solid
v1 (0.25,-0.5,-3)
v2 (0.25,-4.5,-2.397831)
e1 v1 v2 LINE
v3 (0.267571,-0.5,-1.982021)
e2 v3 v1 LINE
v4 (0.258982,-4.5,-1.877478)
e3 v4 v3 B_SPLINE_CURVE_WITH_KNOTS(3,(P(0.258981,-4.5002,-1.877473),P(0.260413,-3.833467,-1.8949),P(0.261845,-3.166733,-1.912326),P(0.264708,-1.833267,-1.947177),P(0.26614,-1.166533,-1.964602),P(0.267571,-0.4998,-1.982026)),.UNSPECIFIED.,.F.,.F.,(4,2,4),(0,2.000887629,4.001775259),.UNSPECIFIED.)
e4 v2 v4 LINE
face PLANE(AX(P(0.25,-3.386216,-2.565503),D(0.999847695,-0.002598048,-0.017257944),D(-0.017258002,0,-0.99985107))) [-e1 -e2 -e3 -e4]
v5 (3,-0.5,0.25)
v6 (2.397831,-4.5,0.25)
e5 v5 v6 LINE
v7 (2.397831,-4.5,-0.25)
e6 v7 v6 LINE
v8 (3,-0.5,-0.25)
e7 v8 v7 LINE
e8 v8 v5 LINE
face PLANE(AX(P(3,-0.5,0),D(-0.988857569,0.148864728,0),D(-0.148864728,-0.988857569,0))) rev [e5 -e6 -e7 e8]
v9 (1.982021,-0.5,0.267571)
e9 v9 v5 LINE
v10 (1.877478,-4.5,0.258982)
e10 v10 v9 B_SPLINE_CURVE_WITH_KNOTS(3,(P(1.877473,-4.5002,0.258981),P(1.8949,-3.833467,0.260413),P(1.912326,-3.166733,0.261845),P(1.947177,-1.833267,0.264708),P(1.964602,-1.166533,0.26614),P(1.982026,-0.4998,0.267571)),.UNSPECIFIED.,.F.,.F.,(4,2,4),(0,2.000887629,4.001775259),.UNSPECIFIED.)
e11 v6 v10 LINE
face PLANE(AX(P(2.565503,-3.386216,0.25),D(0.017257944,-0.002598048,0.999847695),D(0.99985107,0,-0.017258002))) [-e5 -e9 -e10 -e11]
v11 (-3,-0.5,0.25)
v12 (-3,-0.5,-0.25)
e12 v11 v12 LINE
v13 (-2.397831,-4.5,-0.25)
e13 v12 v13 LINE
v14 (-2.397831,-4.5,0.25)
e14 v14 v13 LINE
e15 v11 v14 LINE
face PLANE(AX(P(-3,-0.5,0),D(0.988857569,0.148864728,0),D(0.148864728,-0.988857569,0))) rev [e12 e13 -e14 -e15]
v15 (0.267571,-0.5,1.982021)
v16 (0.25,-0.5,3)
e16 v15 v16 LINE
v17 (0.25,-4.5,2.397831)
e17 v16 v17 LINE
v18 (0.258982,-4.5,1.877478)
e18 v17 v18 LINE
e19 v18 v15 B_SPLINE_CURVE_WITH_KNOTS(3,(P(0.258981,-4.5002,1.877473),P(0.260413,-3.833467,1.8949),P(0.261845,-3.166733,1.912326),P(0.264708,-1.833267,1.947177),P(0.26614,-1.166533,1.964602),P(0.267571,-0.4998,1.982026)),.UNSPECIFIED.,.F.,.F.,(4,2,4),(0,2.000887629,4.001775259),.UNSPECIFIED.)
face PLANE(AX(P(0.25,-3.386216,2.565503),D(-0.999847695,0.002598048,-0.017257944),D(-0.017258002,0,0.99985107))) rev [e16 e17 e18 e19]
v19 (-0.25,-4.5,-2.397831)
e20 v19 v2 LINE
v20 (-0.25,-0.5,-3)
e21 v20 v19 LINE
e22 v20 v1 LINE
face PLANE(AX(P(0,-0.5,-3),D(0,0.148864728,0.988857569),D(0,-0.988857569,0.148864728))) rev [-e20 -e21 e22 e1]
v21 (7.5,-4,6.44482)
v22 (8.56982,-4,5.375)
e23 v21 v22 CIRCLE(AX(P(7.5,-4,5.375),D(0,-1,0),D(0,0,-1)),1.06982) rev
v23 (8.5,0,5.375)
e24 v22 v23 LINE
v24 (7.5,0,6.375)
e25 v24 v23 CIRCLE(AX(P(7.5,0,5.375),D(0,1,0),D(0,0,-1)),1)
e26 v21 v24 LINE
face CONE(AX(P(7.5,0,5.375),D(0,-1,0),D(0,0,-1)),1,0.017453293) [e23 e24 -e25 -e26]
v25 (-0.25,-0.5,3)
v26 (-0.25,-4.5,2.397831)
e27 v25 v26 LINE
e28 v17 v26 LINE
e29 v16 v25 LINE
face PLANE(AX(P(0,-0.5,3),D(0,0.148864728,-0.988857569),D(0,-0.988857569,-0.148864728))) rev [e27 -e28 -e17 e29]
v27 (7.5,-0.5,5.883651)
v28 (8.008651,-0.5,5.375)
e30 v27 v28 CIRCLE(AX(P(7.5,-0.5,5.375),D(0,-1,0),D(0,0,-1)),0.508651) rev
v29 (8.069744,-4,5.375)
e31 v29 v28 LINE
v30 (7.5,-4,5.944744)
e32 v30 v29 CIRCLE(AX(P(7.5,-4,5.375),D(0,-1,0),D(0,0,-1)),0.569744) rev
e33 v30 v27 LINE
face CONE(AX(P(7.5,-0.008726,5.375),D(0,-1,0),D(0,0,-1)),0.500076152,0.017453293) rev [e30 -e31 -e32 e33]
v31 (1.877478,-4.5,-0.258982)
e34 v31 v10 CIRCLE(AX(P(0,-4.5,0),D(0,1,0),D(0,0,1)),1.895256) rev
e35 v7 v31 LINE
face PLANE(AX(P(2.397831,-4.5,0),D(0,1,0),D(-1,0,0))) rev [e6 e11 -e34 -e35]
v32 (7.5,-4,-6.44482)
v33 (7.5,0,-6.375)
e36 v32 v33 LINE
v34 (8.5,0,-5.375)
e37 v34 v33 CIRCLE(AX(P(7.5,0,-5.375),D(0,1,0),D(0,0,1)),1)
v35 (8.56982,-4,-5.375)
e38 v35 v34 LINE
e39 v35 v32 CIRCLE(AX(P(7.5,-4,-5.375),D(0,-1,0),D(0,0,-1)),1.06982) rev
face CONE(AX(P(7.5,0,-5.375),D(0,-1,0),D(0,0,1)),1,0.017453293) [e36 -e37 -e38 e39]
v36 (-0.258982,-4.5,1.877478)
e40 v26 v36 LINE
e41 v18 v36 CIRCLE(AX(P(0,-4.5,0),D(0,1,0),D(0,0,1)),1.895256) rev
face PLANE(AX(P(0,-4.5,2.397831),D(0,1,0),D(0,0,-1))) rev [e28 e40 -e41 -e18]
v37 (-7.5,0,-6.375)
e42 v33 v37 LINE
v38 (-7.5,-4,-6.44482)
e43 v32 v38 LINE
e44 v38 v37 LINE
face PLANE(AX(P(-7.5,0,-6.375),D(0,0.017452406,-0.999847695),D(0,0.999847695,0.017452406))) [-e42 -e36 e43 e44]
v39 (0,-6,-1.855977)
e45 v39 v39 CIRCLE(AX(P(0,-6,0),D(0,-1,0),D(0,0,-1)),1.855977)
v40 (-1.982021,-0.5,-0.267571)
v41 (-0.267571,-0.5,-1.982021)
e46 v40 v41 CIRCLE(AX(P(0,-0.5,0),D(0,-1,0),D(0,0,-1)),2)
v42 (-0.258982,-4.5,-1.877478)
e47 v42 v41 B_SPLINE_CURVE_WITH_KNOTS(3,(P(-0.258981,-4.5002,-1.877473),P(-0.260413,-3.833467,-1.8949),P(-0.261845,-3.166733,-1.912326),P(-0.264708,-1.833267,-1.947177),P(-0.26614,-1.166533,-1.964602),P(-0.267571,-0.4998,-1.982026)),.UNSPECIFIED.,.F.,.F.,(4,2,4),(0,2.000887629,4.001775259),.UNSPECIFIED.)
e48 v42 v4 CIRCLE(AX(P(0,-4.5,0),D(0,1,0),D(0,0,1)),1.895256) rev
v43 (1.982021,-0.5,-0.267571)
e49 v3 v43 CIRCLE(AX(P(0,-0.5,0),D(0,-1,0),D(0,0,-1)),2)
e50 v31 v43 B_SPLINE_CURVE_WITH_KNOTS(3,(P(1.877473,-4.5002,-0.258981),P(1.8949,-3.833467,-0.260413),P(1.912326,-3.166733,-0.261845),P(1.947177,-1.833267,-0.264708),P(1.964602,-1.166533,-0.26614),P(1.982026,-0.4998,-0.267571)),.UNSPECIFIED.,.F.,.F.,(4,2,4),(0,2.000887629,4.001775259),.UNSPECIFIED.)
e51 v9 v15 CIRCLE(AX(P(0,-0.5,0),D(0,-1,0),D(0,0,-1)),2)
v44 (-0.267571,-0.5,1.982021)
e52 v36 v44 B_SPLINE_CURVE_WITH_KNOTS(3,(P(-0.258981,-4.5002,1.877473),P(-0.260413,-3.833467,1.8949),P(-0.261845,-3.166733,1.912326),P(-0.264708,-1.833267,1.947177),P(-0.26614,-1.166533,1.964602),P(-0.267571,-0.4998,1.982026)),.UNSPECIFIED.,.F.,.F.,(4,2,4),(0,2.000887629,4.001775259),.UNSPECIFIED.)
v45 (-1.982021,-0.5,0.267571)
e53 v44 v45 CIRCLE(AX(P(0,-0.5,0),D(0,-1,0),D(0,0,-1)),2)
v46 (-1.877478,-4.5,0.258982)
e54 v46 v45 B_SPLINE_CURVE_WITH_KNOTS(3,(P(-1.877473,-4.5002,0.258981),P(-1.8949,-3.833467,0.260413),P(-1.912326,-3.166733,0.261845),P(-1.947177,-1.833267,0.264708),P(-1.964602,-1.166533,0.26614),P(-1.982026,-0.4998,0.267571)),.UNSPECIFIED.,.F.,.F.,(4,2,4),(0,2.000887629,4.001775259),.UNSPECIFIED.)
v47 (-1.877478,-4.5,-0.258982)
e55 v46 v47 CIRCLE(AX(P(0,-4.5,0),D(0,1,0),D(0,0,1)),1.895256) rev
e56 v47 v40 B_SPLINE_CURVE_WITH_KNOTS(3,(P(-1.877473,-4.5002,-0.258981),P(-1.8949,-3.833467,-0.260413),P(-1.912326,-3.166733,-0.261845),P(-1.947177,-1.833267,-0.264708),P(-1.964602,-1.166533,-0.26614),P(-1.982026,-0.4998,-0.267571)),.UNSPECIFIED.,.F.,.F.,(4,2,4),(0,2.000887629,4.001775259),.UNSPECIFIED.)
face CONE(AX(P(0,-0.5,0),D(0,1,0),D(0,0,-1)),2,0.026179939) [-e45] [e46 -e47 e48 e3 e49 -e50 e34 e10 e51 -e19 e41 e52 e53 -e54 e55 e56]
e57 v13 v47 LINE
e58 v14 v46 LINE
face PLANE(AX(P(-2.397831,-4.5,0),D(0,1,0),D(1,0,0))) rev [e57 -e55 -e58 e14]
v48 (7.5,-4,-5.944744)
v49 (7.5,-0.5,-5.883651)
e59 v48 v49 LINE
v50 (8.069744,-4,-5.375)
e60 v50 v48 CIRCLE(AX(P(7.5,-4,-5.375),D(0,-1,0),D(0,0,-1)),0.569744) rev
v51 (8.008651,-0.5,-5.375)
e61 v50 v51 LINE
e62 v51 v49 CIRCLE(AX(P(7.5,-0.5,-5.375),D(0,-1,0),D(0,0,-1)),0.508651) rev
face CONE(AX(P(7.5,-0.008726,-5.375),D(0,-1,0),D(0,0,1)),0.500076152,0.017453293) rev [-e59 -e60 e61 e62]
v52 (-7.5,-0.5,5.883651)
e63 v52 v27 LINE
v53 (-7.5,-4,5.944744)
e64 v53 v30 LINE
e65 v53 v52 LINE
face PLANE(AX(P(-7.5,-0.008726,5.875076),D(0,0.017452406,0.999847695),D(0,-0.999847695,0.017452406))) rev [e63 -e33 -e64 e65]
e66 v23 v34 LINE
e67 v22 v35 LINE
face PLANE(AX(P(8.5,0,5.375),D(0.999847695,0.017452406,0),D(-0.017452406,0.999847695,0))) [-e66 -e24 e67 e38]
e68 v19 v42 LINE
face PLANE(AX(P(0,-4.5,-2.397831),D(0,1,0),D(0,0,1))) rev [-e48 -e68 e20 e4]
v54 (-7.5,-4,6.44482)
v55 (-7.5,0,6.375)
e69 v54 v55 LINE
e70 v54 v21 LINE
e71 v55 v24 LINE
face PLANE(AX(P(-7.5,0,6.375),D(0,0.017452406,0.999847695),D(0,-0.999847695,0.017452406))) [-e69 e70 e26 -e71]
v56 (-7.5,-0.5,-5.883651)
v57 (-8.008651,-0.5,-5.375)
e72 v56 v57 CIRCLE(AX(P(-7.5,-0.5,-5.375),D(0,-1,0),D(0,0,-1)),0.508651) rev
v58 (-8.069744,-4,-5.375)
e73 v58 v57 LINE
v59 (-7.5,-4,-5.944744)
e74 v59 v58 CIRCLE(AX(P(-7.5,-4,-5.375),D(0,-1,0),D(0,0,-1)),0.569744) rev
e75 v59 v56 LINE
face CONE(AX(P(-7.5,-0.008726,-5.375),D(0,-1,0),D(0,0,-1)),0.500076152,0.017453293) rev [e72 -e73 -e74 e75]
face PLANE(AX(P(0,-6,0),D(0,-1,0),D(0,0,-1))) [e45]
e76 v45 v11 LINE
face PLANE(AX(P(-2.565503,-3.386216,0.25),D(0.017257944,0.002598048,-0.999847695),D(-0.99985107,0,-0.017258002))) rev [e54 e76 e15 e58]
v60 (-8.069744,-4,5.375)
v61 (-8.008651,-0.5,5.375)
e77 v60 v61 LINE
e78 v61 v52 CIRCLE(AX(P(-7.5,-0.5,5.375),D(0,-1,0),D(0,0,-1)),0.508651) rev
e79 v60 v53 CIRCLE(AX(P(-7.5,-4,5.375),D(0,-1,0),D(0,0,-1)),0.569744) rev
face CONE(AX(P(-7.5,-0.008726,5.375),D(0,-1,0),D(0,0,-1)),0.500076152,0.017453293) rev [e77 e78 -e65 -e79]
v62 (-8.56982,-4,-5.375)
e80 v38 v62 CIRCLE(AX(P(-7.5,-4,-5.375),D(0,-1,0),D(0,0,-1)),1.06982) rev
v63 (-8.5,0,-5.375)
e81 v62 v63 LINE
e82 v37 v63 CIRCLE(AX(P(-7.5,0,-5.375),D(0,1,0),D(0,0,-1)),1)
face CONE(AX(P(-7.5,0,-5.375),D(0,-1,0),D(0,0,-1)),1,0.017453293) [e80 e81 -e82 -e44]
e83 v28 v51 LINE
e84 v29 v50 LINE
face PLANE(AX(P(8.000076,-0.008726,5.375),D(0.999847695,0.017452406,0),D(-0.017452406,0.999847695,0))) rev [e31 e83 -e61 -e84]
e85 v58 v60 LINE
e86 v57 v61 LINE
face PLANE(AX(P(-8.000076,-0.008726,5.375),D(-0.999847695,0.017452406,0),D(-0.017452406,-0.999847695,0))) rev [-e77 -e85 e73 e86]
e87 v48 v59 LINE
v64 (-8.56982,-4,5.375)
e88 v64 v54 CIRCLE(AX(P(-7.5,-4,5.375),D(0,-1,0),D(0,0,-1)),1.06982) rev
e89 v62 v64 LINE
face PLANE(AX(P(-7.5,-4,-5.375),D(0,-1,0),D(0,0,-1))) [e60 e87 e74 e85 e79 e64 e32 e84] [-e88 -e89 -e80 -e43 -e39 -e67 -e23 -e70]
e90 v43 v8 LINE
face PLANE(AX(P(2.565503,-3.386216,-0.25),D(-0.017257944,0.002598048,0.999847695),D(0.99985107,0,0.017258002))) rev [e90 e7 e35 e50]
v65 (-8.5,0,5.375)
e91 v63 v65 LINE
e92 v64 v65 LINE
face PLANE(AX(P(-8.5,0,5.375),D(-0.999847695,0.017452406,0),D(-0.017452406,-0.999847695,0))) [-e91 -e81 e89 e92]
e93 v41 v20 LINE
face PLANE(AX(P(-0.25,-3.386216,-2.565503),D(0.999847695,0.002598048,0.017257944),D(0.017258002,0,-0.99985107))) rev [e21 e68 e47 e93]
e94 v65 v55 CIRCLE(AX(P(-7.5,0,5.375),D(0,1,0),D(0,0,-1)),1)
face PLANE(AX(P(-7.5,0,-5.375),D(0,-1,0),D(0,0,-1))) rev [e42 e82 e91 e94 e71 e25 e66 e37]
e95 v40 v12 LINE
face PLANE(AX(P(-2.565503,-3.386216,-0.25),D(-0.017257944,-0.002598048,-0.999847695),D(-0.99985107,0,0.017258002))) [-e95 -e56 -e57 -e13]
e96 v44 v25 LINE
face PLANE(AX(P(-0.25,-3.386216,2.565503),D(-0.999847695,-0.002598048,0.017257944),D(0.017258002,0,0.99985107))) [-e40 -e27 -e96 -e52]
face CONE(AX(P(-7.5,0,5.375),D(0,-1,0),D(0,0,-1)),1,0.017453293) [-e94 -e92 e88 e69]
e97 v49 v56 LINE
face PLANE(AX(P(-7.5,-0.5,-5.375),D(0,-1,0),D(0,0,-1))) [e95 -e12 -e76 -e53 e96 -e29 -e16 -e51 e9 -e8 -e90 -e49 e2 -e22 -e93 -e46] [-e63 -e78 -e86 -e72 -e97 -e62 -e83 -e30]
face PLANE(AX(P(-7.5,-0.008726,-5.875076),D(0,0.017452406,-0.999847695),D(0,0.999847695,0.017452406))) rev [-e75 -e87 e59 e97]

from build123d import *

# Parameters (mm, degrees)
BOSS_EXTRUDE1_DEPTH = 4
BOSS_EXTRUDE1_DRAFT = 1
SHELL1_T            = -0.5
SKETCH2_R           = 2
BOSS_EXTRUDE2_DEPTH = 5.5
BOSS_EXTRUDE2_TAPER = 1.5
CIRPATTERN1_COUNT   = 4


with BuildPart() as part:
    # Sketch1 → Boss-Extrude1 (with draft: the straight prism first)
    with BuildSketch(Plane(origin=(0, 0, 0), x_dir=(1, 0, 0), z_dir=(0, 1, 0))):
        with BuildLine():
            Line((-7.5, -6.375), (7.5, -6.375))
            ThreePointArc((7.5, -6.375), (8.207106781, -6.082106781), (8.5, -5.375))
            Line((8.5, -5.375), (8.5, 5.375))
            ThreePointArc((8.5, 5.375), (8.207106781, 6.082106781), (7.5, 6.375))
            Line((7.5, 6.375), (-7.5, 6.375))
            ThreePointArc((-7.5, 6.375), (-8.207106781, 6.082106781), (-8.5, 5.375))
            Line((-8.5, 5.375), (-8.5, -5.375))
            ThreePointArc((-8.5, -5.375), (-8.207106781, -6.082106781), (-7.5, -6.375))
        make_face()
    extrude(amount=-BOSS_EXTRUDE1_DEPTH)
    # Boss-Extrude1: the draft: its side faces are tilted about the plane it starts from
    boss_extrude1_sides = [part.faces().sort_by_distance(p)[0] for p in [
        (0, -2, 6.375),
        (8.207106781, -2, 6.082106781),
        (8.5, -2, 0),
        (8.207106781, -2, -6.082106781),
        (0, -2, -6.375),
        (-8.207106781, -2, -6.082106781),
        (-8.5, -2, 0),
        (-8.207106781, -2, 6.082106781),
    ]]
    draft(boss_extrude1_sides, Plane(origin=(0, 0, 0), x_dir=(1, 0, 0), z_dir=(0, 1, 0)), BOSS_EXTRUDE1_DRAFT)

    # Shell1
    shell1_openings = [part.faces().sort_by_distance(p)[0] for p in [
        (0, -4, 0),
    ]]
    offset(amount=SHELL1_T, openings=shell1_openings, kind=Kind.INTERSECTION)

    # Sketch2 → Boss-Extrude2 (add)
    with BuildSketch(Plane.XZ.offset(0.5)):
        Circle(SKETCH2_R)
    extrude(amount=BOSS_EXTRUDE2_DEPTH, taper=BOSS_EXTRUDE2_TAPER)

    # Rib1: read off the stored shape, not the designer's step
    # Rib1: loft between two sections, ruled curve by curve
    rib1_from = [
        Edge.make_line((1.982020638, -0.5, 0.267570907), (3, -0.5, 0.25)),
        Edge.make_line((1.982020638, -0.5, -0.267570907), (3, -0.5, -0.25)),
        Edge.make_line((3, -0.5, -0.25), (3, -0.5, 0.25)),
        Edge.make_line((1.982020638, -0.5, -0.267570907), (1.982020638, -0.5, 0.267570907)),
    ]
    rib1_to = [
        Edge.make_line((1.87747837, -4.5, 0.258981593), (2.397831467, -4.5, 0.25)),
        Edge.make_line((1.87747837, -4.5, -0.258981593), (2.397831467, -4.5, -0.25)),
        Edge.make_line((2.397831467, -4.5, -0.25), (2.397831467, -4.5, 0.25)),
        Edge.make_line((1.87747837, -4.5, -0.258981593), (1.87747837, -4.5, 0.258981593)),
    ]
    rib1 = Solid(Shell([*[Face.make_surface_from_curves(rib1_from[k], rib1_to[k]) for k in range(4)], Face(Wire(rib1_from)), Face(Wire(rib1_to))]))
    add(rib1)

    # CirPattern1: Rib1 ×4 about axis
    cirpattern1_axis = Axis((0, 0, 0), (0, 1, 0))
    for i in range(1, CIRPATTERN1_COUNT):
        add(rib1.rotate(cirpattern1_axis, i * 360 / CIRPATTERN1_COUNT))


solid = part.part
